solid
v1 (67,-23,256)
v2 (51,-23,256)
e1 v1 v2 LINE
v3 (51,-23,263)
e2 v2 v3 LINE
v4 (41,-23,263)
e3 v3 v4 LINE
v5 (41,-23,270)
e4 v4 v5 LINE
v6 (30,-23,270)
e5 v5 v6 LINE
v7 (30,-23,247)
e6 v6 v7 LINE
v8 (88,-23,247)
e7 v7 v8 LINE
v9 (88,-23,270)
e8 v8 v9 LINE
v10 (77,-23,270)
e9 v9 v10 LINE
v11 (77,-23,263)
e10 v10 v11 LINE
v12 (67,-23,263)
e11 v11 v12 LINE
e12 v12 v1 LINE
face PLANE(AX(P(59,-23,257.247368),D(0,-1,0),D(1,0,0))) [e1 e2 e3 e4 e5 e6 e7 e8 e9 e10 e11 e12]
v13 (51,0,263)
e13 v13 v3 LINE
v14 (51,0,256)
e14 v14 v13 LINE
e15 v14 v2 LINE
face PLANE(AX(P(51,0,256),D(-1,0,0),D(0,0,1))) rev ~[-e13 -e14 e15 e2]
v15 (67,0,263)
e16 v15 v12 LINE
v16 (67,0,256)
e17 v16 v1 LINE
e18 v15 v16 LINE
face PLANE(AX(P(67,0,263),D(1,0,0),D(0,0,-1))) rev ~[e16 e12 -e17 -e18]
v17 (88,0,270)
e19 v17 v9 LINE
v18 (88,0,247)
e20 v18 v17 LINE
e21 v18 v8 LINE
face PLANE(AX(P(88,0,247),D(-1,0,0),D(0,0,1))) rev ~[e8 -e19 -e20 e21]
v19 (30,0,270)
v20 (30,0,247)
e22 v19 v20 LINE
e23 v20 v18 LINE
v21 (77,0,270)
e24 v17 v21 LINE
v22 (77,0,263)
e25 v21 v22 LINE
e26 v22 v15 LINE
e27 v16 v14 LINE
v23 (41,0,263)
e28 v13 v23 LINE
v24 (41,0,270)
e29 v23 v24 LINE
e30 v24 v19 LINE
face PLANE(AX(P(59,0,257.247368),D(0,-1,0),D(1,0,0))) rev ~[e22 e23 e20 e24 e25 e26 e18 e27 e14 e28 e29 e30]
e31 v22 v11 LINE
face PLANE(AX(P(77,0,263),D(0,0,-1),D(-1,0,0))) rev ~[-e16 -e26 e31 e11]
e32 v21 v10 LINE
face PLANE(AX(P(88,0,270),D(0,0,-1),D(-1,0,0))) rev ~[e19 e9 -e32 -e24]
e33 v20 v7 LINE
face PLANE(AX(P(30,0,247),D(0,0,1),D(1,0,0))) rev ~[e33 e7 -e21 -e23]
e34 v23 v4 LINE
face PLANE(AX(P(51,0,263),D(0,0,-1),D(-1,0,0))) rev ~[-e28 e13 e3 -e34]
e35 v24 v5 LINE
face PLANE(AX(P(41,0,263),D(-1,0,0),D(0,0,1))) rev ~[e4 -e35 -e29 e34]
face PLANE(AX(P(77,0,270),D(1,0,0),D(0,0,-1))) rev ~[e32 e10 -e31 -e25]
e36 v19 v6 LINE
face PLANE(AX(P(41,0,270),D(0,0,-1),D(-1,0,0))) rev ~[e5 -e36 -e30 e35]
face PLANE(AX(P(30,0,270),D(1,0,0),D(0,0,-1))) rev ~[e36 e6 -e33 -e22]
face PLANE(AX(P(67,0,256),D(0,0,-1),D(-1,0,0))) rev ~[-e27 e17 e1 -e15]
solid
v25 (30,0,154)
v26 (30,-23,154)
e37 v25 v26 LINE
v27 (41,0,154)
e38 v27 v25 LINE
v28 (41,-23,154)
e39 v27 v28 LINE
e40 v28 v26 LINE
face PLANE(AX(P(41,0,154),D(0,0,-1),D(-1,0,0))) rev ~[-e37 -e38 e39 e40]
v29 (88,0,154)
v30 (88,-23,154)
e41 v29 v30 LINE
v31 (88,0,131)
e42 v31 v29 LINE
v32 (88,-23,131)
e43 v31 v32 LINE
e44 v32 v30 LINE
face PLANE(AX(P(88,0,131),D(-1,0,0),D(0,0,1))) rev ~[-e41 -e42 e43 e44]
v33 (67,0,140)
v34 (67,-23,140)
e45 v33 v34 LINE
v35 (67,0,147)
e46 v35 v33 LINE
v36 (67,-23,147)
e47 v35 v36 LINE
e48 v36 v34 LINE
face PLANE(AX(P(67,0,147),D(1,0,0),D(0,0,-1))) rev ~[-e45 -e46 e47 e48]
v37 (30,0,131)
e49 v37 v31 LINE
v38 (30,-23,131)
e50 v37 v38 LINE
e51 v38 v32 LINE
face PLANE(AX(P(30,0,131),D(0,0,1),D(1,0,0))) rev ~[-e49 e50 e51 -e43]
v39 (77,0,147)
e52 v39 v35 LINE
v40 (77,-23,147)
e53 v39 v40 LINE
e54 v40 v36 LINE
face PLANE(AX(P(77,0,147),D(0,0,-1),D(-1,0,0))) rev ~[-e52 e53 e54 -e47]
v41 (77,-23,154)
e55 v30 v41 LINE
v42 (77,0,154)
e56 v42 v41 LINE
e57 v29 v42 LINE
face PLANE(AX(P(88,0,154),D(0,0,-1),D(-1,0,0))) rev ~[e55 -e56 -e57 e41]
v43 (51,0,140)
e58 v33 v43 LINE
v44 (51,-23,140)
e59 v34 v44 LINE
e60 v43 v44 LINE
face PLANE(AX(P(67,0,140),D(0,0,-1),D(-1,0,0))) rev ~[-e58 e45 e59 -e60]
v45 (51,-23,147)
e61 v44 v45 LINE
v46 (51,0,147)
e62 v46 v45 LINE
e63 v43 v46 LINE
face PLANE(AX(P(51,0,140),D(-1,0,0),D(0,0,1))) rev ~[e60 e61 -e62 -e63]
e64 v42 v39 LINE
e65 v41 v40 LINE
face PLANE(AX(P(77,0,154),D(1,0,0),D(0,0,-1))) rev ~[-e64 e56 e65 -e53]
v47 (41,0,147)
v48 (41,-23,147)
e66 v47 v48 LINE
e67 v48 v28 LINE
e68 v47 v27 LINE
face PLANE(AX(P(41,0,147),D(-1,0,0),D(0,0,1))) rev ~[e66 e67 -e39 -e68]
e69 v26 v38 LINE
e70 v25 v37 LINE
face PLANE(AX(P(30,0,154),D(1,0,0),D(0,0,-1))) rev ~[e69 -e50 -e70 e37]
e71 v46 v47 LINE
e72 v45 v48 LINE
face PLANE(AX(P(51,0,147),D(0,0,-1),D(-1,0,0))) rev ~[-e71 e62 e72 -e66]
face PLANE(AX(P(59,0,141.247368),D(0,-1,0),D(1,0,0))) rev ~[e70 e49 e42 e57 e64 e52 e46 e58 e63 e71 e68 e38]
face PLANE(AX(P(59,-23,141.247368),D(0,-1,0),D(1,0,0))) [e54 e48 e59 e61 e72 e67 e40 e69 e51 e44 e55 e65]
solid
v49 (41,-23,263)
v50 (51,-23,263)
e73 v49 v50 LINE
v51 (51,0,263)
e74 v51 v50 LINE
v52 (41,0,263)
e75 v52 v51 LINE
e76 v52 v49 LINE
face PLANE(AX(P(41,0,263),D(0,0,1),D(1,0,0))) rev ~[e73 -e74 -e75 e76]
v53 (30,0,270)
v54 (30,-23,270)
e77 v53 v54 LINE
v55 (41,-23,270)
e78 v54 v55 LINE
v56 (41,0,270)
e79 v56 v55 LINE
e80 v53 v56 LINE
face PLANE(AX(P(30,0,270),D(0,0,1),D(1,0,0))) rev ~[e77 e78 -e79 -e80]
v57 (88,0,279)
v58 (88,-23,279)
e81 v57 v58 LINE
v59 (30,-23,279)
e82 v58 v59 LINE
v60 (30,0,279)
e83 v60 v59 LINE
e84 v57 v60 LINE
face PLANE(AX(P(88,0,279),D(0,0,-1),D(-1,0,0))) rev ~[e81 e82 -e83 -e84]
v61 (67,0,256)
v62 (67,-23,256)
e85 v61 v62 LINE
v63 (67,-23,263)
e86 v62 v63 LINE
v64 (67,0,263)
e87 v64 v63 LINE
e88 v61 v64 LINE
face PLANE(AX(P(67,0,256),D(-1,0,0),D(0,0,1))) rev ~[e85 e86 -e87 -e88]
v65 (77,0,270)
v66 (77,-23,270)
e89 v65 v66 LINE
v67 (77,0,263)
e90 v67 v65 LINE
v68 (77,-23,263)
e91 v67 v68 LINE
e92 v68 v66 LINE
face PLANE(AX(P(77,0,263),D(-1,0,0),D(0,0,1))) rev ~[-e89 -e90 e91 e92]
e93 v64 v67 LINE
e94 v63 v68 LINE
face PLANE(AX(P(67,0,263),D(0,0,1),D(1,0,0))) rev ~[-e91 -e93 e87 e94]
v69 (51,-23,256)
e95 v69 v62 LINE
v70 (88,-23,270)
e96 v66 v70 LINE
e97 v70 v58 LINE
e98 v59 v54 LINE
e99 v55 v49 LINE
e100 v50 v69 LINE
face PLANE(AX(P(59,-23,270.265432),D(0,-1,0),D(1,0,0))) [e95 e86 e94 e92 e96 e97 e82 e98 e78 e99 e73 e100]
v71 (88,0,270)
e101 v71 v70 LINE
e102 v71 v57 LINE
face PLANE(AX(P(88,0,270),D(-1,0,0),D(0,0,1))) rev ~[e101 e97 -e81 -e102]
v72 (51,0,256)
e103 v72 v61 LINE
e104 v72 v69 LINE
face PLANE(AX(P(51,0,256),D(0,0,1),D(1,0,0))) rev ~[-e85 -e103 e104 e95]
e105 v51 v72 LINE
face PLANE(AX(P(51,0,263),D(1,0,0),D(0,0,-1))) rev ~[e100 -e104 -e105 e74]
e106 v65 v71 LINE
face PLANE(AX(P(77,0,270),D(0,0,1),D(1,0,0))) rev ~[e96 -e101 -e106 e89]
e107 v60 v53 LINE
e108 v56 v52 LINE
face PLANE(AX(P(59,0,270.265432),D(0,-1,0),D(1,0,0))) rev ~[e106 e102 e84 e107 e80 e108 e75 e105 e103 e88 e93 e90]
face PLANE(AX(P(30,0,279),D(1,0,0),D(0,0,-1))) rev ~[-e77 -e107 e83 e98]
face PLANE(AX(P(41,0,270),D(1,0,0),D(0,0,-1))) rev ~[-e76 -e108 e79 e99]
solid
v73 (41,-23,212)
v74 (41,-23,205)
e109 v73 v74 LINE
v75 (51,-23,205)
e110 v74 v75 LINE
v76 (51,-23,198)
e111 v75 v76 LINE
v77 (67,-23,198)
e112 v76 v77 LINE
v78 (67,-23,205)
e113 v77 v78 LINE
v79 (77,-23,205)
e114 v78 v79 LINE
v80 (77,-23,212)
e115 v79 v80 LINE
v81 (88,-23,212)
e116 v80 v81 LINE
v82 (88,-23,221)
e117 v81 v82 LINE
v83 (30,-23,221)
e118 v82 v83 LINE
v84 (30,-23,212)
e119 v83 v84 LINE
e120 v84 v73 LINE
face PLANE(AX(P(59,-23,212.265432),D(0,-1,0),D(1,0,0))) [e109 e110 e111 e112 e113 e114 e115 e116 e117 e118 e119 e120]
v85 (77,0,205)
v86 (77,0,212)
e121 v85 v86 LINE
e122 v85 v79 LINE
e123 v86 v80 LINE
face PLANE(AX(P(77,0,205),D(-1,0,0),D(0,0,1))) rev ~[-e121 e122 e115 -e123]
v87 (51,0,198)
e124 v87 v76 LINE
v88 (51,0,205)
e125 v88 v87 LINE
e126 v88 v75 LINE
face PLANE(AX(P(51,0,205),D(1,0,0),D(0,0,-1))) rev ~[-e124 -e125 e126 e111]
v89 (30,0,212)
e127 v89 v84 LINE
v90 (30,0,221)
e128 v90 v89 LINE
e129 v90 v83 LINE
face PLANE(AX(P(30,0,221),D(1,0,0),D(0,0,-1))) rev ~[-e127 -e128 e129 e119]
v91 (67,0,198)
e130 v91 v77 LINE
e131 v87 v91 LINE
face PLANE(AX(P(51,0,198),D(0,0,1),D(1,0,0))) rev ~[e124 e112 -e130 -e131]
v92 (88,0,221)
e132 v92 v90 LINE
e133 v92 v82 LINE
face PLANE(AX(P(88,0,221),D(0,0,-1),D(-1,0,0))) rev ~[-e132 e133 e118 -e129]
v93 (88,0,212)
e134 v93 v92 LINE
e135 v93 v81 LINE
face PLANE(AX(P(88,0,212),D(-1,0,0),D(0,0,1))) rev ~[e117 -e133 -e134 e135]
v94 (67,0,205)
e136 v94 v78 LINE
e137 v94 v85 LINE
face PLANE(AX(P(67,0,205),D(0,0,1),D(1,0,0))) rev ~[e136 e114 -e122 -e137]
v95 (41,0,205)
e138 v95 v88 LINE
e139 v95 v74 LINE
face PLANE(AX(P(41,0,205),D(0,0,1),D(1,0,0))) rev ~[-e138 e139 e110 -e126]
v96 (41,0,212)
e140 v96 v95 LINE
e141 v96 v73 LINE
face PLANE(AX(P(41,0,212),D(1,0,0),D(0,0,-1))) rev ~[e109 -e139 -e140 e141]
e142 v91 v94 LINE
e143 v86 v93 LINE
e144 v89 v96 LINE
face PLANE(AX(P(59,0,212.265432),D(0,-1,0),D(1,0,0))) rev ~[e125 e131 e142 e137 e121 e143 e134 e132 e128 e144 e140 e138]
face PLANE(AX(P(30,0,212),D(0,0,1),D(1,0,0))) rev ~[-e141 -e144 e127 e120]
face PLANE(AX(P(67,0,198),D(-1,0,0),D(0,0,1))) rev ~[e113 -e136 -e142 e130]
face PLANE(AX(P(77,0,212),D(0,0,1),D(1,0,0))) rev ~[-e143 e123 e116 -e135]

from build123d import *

# Parameters (mm, degrees)
F2_DEPTH = 23
F3_DEPTH = 23


# Not quite as in the source:
# - a feature names something its author has since deleted; it is built from what else it names


with BuildPart() as f2:
    # F1 (on Front) → F2 (new body)
    with BuildSketch(Plane.XZ):
        Polygon((30, 279), (30, 270), (41, 270), (41, 263), (51, 263), (51, 256), (59, 256), (67, 256), (67, 263), (77, 263), (77, 270), (88, 270), (88, 279), align=None)
    extrude(amount=F2_DEPTH)


with BuildPart() as f2b:
    # F1 (on Front) → F2, piece 2 (new body)
    with BuildSketch(Plane.XZ):
        Polygon((41, 212), (41, 205), (51, 205), (51, 198), (59, 198), (67, 198), (67, 205), (77, 205), (77, 212), (88, 212), (88, 221), (30, 221), (30, 212), align=None)
    extrude(amount=F2_DEPTH)


with BuildPart() as f2c:
    # F1 (on Front) → F2, piece 3 (new body)
    with BuildSketch(Plane.XZ):
        Polygon((51, 147), (41, 147), (41, 154), (30, 154), (30, 131), (88, 131), (88, 154), (77, 154), (77, 147), (67, 147), (67, 140), (59, 140), (51, 140), align=None)
    extrude(amount=F2_DEPTH)


with BuildPart() as f3:
    # F1 (on Front) → F3 (new body)
    with BuildSketch(Plane.XZ):
        Polygon((41, 270), (30, 270), (30, 247), (88, 247), (88, 270), (77, 270), (77, 263), (67, 263), (67, 256), (59, 256), (51, 256), (51, 263), (41, 263), align=None)
    extrude(amount=F3_DEPTH)


solid = Compound([f2.part, f2b.part, f2c.part, f3.part])
